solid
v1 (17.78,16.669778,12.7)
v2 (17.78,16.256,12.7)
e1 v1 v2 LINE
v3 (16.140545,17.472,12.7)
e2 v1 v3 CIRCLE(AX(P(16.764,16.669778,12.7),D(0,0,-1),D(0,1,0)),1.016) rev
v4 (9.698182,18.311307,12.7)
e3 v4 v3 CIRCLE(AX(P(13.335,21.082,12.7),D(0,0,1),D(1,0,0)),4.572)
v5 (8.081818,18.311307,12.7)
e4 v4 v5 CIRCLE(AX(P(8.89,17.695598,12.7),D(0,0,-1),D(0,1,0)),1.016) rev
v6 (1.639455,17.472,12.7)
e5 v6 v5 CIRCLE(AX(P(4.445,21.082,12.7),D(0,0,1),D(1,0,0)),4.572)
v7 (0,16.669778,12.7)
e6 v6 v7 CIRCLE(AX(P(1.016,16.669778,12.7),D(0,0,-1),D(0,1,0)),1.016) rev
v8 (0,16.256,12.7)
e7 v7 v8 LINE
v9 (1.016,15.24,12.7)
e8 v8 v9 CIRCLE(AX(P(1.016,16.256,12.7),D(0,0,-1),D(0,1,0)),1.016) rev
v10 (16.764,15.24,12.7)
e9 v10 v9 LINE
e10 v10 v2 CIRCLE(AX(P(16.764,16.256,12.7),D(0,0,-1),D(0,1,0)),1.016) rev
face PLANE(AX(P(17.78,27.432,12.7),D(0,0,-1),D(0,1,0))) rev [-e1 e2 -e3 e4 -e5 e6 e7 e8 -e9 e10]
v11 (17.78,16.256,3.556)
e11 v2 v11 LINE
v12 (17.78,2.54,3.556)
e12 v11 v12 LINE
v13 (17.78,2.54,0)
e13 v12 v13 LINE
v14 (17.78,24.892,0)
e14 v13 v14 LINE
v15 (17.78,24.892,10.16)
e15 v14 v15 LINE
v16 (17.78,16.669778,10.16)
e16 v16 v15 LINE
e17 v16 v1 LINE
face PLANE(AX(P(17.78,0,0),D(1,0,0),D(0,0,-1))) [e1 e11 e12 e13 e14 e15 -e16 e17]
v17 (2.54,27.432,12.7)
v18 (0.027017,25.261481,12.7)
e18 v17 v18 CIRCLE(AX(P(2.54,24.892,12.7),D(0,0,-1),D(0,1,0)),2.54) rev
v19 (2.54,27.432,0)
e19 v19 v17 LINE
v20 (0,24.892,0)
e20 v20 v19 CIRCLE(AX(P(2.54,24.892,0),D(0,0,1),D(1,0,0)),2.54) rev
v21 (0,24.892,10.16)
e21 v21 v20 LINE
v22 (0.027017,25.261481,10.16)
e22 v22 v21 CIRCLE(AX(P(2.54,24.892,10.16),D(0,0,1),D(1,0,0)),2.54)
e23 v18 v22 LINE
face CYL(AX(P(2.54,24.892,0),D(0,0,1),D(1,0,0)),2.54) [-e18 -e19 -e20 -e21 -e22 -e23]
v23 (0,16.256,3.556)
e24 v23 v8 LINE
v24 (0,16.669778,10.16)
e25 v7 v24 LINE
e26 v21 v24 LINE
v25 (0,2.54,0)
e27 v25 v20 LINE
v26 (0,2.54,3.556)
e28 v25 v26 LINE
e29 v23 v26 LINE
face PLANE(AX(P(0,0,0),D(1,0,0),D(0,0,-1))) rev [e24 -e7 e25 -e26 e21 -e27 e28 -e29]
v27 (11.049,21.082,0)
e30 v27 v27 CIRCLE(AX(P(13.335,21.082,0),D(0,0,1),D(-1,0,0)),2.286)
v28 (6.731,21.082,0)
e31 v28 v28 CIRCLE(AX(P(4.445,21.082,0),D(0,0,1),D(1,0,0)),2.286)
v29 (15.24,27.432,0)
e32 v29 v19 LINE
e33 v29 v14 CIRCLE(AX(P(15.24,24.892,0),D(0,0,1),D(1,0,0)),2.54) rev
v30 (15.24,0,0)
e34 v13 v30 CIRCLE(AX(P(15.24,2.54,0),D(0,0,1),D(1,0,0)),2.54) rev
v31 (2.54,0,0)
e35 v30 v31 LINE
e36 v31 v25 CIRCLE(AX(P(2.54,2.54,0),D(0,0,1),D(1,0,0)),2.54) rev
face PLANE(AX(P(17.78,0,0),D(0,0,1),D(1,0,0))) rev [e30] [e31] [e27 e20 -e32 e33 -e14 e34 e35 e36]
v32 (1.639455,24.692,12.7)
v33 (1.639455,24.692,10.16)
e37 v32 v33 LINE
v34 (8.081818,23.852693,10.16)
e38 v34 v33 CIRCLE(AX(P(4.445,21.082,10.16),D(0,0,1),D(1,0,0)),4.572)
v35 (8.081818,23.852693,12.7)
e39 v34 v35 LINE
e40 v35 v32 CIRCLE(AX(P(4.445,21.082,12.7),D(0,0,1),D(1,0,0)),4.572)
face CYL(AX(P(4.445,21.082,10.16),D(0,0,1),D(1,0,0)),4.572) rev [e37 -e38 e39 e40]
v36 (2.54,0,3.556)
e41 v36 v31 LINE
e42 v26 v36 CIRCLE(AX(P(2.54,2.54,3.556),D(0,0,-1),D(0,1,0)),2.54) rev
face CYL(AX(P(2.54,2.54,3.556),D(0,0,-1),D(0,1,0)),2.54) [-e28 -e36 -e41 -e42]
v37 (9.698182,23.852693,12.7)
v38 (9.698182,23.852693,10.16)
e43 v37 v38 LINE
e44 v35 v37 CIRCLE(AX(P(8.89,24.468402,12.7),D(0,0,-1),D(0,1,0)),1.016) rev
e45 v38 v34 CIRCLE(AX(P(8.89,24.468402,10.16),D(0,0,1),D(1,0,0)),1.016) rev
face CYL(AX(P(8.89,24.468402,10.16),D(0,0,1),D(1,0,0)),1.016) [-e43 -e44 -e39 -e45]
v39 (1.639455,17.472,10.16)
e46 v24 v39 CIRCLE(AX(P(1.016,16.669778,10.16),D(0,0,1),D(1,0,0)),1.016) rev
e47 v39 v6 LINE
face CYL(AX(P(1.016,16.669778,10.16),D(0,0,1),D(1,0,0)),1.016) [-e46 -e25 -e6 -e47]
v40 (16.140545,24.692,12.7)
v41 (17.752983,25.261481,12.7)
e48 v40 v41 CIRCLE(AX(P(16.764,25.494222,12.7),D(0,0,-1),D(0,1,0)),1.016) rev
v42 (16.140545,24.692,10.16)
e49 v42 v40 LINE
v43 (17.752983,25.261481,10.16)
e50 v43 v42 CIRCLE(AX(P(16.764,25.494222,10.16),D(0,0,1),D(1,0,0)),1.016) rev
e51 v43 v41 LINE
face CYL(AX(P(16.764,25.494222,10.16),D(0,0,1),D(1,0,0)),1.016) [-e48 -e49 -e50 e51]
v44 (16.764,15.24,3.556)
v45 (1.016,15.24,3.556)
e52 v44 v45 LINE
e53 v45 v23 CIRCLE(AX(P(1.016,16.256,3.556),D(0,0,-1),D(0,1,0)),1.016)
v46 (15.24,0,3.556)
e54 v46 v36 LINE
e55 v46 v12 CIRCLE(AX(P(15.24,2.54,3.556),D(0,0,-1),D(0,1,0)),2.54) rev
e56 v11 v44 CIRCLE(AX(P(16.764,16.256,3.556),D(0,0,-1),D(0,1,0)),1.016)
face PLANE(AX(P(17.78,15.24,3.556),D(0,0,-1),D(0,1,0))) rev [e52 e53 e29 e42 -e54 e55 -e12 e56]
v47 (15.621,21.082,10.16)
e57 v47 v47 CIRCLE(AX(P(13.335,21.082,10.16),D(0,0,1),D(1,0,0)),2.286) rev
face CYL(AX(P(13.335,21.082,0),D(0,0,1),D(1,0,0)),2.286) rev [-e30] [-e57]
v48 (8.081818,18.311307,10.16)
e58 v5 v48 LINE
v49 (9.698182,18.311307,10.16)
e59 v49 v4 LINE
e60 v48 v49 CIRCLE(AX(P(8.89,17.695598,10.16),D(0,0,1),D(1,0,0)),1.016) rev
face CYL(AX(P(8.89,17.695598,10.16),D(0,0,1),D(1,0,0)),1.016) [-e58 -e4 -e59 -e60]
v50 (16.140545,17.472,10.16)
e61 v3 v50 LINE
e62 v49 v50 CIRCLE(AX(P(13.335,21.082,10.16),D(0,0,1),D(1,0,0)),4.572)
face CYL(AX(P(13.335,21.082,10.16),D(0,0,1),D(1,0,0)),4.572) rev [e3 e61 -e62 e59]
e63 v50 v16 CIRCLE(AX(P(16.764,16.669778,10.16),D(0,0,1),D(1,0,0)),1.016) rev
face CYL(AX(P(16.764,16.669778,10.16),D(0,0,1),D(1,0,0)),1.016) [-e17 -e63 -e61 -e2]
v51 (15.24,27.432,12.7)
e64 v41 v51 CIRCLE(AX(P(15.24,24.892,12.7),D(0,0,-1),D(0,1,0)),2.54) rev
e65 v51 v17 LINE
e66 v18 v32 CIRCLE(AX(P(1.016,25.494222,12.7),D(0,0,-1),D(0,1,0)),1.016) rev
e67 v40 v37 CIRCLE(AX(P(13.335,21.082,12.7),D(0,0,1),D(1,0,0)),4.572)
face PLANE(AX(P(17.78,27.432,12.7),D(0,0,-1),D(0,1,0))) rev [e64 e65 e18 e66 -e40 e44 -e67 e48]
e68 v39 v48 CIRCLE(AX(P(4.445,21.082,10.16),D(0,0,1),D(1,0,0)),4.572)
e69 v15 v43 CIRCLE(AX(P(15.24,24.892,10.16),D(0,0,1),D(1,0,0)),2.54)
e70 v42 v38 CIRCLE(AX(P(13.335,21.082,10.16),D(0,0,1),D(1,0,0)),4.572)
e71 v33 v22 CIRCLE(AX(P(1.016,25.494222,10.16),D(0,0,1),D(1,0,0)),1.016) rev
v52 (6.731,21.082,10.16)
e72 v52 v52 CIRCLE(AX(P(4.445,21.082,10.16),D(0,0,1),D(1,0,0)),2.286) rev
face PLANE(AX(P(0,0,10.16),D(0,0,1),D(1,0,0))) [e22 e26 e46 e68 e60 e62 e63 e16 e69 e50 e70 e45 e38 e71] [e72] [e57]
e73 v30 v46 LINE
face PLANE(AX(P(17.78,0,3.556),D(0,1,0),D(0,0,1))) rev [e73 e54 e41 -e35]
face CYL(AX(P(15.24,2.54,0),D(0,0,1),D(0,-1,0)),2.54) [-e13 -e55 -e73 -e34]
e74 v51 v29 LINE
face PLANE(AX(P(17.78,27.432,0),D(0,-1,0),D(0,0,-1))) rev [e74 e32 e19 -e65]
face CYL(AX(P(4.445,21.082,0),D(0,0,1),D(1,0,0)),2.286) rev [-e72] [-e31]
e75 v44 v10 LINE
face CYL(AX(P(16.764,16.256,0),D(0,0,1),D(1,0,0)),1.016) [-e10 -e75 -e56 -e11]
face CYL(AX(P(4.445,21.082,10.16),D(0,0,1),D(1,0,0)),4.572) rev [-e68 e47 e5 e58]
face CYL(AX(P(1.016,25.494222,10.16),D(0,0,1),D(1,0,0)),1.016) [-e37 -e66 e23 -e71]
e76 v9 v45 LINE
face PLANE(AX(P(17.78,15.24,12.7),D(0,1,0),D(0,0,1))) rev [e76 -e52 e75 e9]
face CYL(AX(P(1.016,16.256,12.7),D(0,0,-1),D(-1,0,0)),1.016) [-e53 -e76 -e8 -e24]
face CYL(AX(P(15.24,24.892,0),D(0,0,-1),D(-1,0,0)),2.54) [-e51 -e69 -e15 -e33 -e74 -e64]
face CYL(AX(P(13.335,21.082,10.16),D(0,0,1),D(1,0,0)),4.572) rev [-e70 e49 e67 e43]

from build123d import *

# Parameters (mm, degrees)
BOSS_EXTRUDE1_DEPTH = 17.78
SKETCH2_R           = 2.286
CUT_EXTRUDE1_DEPTH  = 36.070400967
SKETCH3_R           = 2.286
SKETCH3_R_2         = 4.572
CUT_EXTRUDE2_DEPTH  = 2.54
FILLET1_R           = 1.016
FILLET2_R           = 2.54


with BuildPart() as part:
    # Sketch1 → Boss-Extrude1 (new body)
    with BuildSketch(Plane(origin=(0, 0, 0), x_dir=(0, 0, -1), z_dir=(1, 0, 0))):
        Polygon((0, 0), (0, 27.432), (-12.7, 27.432), (-12.7, 15.24), (-3.556, 15.24), (-3.556, 0), align=None)
    extrude(amount=BOSS_EXTRUDE1_DEPTH)

    # Sketch2 → Cut-Extrude1 (cut, through all)
    with BuildSketch(Plane.XY.offset(12.7)):
        with Locations((4.445, 21.082)):
            Circle(SKETCH2_R)
        with Locations(Location((13.335, 21.082, 0), (0, 0, 180))):
            Circle(SKETCH2_R)
    extrude(amount=-CUT_EXTRUDE1_DEPTH, mode=Mode.SUBTRACT)

    # Sketch3 → Cut-Extrude2 (cut)
    # profile 1 of 4: a face of its own
    with BuildSketch(Plane.XY.offset(12.7)):
        with BuildLine():
            ThreePointArc((8.89, 20.011878979), (8.763, 21.082), (8.89, 22.152121021))
            ThreePointArc((8.89, 22.152121021), (4.445, 25.654), (0, 22.152121021))
            Line((0, 22.152121021), (0, 20.011878979))
            ThreePointArc((0, 20.011878979), (4.445, 16.51), (8.89, 20.011878979))
        make_face()
        with Locations((4.445, 21.082)):
            Circle(SKETCH3_R, mode=Mode.SUBTRACT)
    # profile 2 of 4: a face of its own
    with BuildSketch(Plane.XY.offset(12.7)):
        with BuildLine():
            ThreePointArc((8.89, 22.152121021), (8.985138985, 21.620815367), (9.017, 21.082))
            ThreePointArc((9.017, 21.082), (8.985138985, 20.543184633), (8.89, 20.011878979))
            ThreePointArc((8.89, 20.011878979), (13.335, 16.51), (17.78, 20.011878979))
            Line((17.78, 20.011878979), (17.78, 22.152121021))
            ThreePointArc((17.78, 22.152121021), (13.335, 25.654), (8.89, 22.152121021))
        make_face()
        with Locations((13.335, 21.082)):
            Circle(SKETCH3_R, mode=Mode.SUBTRACT)
    # profile 3 of 4: a face of its own
    with BuildSketch(Plane.XY.offset(12.7)):
        with Locations((4.445, 21.082)):
            Circle(SKETCH3_R_2)
    # profile 4 of 4: a face of its own
    with BuildSketch(Plane.XY.offset(12.7)):
        with Locations((13.335, 21.082)):
            Circle(SKETCH3_R_2)
    extrude(amount=-CUT_EXTRUDE2_DEPTH, mode=Mode.SUBTRACT)

    # Fillet1
    fillet1_edges = [part.edges().sort_by_distance(p)[0] for p in [
        (17.78, 15.24, 8.128),
        (8.89, 20.011878979, 11.43),
        (0, 20.011878979, 11.43),
        (0, 22.152121021, 11.43),
        (8.89, 22.152121021, 11.43),
        (17.78, 22.152121021, 11.43),
        (17.78, 20.011878979, 11.43),
        (0, 15.24, 8.128),
    ]]
    fillet(fillet1_edges, radius=FILLET1_R)

    # Fillet2
    # the kernel refuses this fillet: 2.54 mm, written as the material it takes off along each edge
    with BuildSketch(Plane(origin=(0, 27.432, -6.35), x_dir=(0, -1, 0), z_dir=(0, 0, 1))) as fillet2_piece_1:
        with BuildLine():
            CenterArc((FILLET2_R, FILLET2_R), FILLET2_R, 180, 90)
            Line((0, FILLET2_R), (-FILLET2_R * 0.02, FILLET2_R))
            Line((-FILLET2_R * 0.02, FILLET2_R), (-FILLET2_R * 0.02, -FILLET2_R * 0.02))
            Line((-FILLET2_R * 0.02, -FILLET2_R * 0.02), (FILLET2_R, -FILLET2_R * 0.02))
            Line((FILLET2_R, -FILLET2_R * 0.02), (FILLET2_R, 0))
        make_face()
    extrude(amount=25.4, mode=Mode.SUBTRACT)
    with BuildSketch(Plane(origin=(17.78, 27.432, -6.35), x_dir=(0, -1, 0), z_dir=(0, 0, 1))) as fillet2_piece_2:
        with BuildLine():
            CenterArc((FILLET2_R, -FILLET2_R), FILLET2_R, 90, 90)
            Line((0, -FILLET2_R), (-FILLET2_R * 0.02, -FILLET2_R))
            Line((-FILLET2_R * 0.02, -FILLET2_R), (-FILLET2_R * 0.02, FILLET2_R * 0.02))
            Line((-FILLET2_R * 0.02, FILLET2_R * 0.02), (FILLET2_R, FILLET2_R * 0.02))
            Line((FILLET2_R, FILLET2_R * 0.02), (FILLET2_R, 0))
        make_face()
    extrude(amount=25.4, mode=Mode.SUBTRACT)
    with BuildSketch(Plane(origin=(0, 0, 9.906), x_dir=(0, 1, 0), z_dir=(0, 0, -1))) as fillet2_piece_3:
        with BuildLine():
            CenterArc((FILLET2_R, FILLET2_R), FILLET2_R, 180, 90)
            Line((0, FILLET2_R), (-FILLET2_R * 0.02, FILLET2_R))
            Line((-FILLET2_R * 0.02, FILLET2_R), (-FILLET2_R * 0.02, -FILLET2_R * 0.02))
            Line((-FILLET2_R * 0.02, -FILLET2_R * 0.02), (FILLET2_R, -FILLET2_R * 0.02))
            Line((FILLET2_R, -FILLET2_R * 0.02), (FILLET2_R, 0))
        make_face()
    extrude(amount=16.256, mode=Mode.SUBTRACT)
    with BuildSketch(Plane(origin=(17.78, 0, 9.906), x_dir=(0, 1, 0), z_dir=(0, 0, -1))) as fillet2_piece_4:
        with BuildLine():
            CenterArc((FILLET2_R, -FILLET2_R), FILLET2_R, 90, 90)
            Line((0, -FILLET2_R), (-FILLET2_R * 0.02, -FILLET2_R))
            Line((-FILLET2_R * 0.02, -FILLET2_R), (-FILLET2_R * 0.02, FILLET2_R * 0.02))
            Line((-FILLET2_R * 0.02, FILLET2_R * 0.02), (FILLET2_R, FILLET2_R * 0.02))
            Line((FILLET2_R, FILLET2_R * 0.02), (FILLET2_R, 0))
        make_face()
    extrude(amount=16.256, mode=Mode.SUBTRACT)


solid = part.part
